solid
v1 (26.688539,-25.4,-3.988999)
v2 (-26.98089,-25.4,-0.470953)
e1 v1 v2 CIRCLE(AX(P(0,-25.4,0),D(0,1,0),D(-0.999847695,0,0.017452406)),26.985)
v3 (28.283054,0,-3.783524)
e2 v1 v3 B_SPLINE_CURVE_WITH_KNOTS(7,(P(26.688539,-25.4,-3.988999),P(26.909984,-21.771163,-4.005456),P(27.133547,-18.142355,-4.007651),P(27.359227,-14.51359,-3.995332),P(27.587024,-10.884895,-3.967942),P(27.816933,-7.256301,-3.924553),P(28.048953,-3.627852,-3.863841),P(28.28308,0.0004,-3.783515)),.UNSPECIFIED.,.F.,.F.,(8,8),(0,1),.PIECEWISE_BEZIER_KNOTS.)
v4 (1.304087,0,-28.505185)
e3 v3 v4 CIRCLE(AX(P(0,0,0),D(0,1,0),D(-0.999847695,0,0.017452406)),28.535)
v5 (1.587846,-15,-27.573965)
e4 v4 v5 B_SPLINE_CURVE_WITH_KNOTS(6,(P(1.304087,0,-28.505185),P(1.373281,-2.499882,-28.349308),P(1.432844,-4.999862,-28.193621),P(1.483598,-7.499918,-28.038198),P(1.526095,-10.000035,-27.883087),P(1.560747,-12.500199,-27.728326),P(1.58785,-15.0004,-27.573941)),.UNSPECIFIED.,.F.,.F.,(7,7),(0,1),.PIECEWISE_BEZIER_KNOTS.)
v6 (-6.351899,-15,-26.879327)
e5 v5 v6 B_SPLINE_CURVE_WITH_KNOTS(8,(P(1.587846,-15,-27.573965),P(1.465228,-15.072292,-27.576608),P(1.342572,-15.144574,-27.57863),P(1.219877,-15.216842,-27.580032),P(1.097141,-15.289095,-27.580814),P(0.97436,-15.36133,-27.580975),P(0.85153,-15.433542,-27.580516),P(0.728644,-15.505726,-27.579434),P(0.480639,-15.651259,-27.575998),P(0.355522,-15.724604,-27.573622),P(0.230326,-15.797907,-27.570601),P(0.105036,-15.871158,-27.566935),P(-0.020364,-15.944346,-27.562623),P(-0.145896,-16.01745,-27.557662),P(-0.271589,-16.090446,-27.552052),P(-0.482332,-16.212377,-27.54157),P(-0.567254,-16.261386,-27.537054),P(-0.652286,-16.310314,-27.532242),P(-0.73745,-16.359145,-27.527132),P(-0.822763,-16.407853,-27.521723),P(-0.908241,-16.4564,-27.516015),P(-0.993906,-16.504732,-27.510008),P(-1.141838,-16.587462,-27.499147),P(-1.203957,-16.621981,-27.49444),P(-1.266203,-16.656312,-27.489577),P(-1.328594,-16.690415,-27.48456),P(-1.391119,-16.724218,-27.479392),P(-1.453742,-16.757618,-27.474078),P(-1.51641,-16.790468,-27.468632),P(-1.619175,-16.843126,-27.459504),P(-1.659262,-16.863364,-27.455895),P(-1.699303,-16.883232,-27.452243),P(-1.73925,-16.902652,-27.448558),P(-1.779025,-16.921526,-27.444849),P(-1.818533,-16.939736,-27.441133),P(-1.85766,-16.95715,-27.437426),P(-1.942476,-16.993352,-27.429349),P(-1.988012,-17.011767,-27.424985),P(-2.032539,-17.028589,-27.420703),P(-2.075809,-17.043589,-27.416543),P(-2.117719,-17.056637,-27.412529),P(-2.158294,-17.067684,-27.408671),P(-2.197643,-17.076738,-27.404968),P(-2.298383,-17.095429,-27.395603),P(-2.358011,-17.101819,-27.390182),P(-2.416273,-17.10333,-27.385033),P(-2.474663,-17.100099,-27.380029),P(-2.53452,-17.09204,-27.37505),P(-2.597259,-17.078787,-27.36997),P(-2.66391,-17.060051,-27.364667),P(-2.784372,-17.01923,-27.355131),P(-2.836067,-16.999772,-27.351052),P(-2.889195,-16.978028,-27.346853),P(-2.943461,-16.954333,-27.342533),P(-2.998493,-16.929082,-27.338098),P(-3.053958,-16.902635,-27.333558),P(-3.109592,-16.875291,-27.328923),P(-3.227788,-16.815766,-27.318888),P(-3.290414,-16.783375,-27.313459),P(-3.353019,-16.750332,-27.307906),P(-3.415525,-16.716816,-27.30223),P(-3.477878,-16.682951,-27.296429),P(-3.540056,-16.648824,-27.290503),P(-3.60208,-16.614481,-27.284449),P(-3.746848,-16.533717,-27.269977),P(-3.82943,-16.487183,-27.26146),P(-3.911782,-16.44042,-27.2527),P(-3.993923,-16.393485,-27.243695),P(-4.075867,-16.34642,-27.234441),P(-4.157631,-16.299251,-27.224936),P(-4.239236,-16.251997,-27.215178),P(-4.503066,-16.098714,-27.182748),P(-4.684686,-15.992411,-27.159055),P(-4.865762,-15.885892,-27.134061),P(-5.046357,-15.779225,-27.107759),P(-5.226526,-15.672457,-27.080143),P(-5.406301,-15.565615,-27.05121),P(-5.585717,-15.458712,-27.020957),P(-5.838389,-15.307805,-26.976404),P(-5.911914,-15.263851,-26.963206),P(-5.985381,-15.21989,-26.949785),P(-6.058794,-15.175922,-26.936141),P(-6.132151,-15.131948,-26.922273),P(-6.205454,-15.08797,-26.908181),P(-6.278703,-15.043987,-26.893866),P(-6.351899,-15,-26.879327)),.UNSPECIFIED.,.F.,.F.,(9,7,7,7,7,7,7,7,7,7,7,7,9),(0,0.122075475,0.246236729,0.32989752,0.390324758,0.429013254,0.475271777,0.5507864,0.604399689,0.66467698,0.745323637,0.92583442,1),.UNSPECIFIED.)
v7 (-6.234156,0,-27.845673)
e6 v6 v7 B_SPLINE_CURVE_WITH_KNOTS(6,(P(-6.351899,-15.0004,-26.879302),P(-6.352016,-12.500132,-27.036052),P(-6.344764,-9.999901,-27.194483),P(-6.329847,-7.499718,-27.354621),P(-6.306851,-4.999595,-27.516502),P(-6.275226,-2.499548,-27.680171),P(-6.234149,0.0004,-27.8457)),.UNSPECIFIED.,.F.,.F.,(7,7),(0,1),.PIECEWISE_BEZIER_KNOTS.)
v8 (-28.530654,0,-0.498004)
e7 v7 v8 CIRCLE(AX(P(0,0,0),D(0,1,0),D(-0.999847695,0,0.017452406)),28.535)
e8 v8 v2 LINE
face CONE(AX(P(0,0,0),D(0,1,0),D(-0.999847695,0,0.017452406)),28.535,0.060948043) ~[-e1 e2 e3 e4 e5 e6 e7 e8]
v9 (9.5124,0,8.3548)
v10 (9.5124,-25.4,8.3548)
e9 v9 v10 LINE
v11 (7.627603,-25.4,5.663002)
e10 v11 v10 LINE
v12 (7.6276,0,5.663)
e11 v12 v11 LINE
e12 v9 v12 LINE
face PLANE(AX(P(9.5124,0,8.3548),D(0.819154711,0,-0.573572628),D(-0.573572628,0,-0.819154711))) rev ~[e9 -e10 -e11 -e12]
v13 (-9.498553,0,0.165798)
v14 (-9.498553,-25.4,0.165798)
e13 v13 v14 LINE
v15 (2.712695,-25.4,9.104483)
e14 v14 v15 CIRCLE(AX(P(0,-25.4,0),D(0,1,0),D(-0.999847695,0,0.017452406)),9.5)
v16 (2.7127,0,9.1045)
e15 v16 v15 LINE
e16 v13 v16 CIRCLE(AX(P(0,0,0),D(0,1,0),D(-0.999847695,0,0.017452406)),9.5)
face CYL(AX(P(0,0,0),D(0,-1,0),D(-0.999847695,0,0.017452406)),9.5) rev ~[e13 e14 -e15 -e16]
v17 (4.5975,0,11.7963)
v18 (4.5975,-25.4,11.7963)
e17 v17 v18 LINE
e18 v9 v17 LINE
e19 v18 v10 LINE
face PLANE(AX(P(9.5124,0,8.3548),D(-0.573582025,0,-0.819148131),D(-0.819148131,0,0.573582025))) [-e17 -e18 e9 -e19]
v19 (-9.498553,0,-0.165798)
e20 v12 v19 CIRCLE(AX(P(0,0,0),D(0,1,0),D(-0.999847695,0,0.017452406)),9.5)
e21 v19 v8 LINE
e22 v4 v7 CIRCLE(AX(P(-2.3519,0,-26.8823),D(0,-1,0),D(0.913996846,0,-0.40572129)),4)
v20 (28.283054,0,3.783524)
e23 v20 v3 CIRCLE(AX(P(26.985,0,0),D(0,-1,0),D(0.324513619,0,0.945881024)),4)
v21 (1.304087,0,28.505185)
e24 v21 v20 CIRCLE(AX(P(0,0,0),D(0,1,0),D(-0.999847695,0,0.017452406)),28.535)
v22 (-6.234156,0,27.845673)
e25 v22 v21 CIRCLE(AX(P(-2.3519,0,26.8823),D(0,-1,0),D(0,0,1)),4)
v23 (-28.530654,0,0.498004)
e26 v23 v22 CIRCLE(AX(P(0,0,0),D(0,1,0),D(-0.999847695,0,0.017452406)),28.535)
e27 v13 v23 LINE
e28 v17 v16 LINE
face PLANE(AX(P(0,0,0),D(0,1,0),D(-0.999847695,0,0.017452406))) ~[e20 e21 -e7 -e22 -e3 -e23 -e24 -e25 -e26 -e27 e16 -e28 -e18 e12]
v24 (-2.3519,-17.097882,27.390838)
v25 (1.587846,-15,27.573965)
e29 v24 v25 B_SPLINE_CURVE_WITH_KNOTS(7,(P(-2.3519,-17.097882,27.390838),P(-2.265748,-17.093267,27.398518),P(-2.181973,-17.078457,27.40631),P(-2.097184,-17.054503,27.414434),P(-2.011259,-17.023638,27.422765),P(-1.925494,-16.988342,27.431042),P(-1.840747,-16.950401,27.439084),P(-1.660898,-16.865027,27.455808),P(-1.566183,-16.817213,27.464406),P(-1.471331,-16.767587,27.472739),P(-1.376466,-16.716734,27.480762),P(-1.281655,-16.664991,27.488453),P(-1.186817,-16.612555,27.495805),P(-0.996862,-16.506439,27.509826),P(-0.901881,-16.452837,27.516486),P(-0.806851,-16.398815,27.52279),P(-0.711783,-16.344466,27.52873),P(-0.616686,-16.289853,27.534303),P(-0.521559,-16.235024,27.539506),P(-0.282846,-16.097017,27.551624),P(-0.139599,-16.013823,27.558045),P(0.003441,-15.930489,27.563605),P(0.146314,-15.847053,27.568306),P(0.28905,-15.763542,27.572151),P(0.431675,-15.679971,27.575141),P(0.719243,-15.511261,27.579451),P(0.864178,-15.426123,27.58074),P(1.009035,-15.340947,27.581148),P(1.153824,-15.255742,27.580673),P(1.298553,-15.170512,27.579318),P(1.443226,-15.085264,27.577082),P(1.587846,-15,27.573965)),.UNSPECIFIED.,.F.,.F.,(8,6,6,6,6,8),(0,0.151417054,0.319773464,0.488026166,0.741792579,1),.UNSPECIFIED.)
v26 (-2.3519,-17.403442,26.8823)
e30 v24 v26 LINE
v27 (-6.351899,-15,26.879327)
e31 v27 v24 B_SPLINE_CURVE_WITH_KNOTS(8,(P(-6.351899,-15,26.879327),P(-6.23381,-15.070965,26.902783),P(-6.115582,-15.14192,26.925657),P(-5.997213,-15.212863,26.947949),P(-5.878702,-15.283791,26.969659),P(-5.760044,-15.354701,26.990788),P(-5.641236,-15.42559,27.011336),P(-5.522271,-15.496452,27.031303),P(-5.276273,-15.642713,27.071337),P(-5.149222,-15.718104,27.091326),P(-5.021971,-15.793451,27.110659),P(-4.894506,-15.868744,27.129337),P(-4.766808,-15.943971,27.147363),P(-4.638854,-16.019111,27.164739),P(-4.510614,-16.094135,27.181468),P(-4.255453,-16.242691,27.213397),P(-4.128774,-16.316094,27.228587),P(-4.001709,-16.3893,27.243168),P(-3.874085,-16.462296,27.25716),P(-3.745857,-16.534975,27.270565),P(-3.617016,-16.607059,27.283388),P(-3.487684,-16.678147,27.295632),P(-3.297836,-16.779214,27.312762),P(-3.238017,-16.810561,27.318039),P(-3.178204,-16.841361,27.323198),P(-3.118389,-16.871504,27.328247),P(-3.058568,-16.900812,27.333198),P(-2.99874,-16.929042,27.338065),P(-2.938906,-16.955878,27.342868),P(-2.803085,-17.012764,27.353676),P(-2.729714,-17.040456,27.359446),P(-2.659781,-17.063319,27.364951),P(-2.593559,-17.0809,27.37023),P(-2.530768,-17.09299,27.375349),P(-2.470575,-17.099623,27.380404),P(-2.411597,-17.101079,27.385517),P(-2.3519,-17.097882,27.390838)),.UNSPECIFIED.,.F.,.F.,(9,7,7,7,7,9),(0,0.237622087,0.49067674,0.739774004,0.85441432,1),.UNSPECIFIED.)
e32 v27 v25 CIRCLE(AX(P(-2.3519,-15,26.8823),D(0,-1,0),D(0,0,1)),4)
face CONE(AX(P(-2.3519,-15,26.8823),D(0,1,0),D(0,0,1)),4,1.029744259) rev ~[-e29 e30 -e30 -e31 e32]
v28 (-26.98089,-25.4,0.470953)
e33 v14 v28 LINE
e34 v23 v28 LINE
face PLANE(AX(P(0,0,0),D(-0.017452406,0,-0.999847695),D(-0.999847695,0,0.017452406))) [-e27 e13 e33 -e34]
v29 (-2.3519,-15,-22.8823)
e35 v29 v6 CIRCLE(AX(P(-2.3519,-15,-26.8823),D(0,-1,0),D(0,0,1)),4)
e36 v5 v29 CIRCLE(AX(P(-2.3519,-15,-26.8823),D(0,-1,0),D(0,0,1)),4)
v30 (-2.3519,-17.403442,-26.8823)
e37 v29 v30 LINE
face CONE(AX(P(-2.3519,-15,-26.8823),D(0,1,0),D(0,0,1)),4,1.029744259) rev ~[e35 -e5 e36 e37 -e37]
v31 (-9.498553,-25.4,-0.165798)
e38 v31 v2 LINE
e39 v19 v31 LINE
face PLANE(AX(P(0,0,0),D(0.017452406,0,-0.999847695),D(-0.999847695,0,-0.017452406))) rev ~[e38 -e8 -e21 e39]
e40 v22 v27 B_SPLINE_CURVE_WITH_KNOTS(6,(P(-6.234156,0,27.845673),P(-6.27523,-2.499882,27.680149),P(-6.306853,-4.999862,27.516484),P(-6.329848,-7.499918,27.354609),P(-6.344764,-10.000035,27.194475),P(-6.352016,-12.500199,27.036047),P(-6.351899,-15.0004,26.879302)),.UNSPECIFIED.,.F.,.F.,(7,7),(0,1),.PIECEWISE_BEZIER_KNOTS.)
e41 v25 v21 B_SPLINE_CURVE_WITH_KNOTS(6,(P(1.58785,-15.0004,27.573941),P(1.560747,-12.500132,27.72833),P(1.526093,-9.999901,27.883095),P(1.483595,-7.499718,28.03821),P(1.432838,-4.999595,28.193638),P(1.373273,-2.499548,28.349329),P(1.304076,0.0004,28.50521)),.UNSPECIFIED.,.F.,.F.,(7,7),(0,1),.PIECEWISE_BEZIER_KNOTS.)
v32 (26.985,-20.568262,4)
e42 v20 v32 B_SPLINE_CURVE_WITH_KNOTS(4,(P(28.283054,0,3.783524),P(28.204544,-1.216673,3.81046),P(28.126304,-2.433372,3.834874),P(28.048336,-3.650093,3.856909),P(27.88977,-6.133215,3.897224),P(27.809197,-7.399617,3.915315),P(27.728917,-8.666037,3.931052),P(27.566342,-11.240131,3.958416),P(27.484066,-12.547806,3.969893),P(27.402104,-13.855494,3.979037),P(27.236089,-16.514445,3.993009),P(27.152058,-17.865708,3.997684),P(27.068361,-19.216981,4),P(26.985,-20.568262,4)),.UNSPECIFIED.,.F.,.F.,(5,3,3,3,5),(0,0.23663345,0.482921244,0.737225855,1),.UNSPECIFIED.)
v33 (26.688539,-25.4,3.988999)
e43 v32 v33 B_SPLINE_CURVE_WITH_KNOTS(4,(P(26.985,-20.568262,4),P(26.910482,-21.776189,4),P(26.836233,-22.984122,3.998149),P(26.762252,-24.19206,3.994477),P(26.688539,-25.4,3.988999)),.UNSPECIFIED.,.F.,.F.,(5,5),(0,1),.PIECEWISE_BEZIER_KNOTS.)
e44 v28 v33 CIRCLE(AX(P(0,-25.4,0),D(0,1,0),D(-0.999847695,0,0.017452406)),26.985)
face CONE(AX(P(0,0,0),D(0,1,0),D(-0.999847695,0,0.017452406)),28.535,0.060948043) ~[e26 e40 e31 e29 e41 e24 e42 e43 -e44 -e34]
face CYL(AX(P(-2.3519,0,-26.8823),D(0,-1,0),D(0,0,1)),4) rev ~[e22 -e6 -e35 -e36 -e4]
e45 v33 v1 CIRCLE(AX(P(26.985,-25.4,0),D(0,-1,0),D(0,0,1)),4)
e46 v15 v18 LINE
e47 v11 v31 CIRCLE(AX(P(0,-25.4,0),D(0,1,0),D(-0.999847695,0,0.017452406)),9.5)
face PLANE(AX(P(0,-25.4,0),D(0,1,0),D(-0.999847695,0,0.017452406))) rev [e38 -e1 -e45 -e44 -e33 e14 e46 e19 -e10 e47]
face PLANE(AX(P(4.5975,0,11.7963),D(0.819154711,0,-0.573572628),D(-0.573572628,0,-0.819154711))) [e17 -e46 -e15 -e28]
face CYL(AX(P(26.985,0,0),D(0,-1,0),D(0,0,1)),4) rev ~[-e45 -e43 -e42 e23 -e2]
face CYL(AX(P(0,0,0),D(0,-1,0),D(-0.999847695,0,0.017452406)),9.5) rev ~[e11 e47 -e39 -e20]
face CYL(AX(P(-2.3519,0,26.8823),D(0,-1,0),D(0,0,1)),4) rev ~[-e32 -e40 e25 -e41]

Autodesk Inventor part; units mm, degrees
ref_plane "YZ Plane" through (0, 0, 0) normal (1, 0, 0) x (0, 1, 0)
ref_plane "XZ Plane" through (0, 0, 0) normal (0, 1, 0) x (-1, 0, 0)
ref_plane "XY Plane" through (0, 0, 0) normal (0, 0, 1) x (1, 0, 0)
sketch "Sketch2" plane through (0, 0, 0) normal (0, 0, 1) x (1, 0, 0)
  line L0 (9.5, 0) -> (9.5, -25.4)
  line L1 (9.5, 0) -> (28.535, 0)
  line L2 (9.5, -25.4) -> (26.985, -25.4)
  line L3 (28.535, 0) -> (26.985, -25.4)
  line L4 (0, -30.48) -> (0, 5.08) projected
  point P0 (0, 0)
  dimension "d5" = 9.5
  dimension "d6" = 25.4
  dimension "d7" = 19.035
  dimension "d8" = 17.485
revolve "Revolution1" add sketch "Sketch2" angle 358 mid plane about axis through (0, -10, 0) along (0, 1, 0)
sketch "Sketch3" plane through (0, 0, 0) normal (0, 1, 0) x (-1, 0, 0)
  line L0 (0, 0) -> (-7.055, 10.0756) construction
  line L1 (0, 0) -> (-9.5, 0) construction
  arc A0 (9.4986, 0.1658) -> (9.4986, -0.1658) centre (0, 0) ccw projected
  line L2 (-9.5124, 8.3548) -> (-4.5975, 11.7963)
  line L3 (-9.5124, 8.3548) -> (-7.6276, 5.663)
  line L4 (-4.5975, 11.7963) -> (-2.7127, 9.1045)
  dimension "d10" = 55
  dimension "d11" = 12.3
  dimension "d12" = 6
extrude "Extrusion2" cut sketch "Sketch3" against normal through all
sketch "Sketch4" plane through (0, 0, 0) normal (0, 1, 0) x (-1, 0, 0)
  arc A0 (26.9809, 0.471) -> (26.9809, -0.471) centre (0, 0) ccw projected
  point P0 (0, 0)
  point P1 (-26.985, 0)
sketch "Sketch5" plane through (0, 0, 0) normal (0, 1, 0) x (-1, 0, 0)
  arc A0 (26.9809, 0.471) -> (26.9809, -0.471) centre (0, 0) ccw projected
  arc A1 (26.9809, 0.471) -> (26.9809, -0.471) centre (0, 0) ccw projected
  line L0 (0, 0) -> (26.985, 0) construction
  line L1 (0, 0) -> (3.6164, 41.3358) construction
  line L2 (0, 0) -> (3.8154, -43.6107) construction
  point P0 (0, 0)
  point P1 (-26.6885, 3.989)
  point P2 (-26.6885, -3.989)
  point P3 (2.3519, -26.8823)
  point P4 (2.3519, 26.8823)
  dimension "d18" = 85
  dimension "d21" = 85
hole "Hole1" at (26.985, 0, 0) direction (0, -1, 0) diameter 8 end through all
hole "Hole2" at (-2.3519, 0, -26.8823) at (-2.3519, 0, 26.8823) direction (0, -1, 0) diameter 8 depth 15 tip angle 118
equation "\"d21\" = d18"
properties part number "Втулка для шкива"
